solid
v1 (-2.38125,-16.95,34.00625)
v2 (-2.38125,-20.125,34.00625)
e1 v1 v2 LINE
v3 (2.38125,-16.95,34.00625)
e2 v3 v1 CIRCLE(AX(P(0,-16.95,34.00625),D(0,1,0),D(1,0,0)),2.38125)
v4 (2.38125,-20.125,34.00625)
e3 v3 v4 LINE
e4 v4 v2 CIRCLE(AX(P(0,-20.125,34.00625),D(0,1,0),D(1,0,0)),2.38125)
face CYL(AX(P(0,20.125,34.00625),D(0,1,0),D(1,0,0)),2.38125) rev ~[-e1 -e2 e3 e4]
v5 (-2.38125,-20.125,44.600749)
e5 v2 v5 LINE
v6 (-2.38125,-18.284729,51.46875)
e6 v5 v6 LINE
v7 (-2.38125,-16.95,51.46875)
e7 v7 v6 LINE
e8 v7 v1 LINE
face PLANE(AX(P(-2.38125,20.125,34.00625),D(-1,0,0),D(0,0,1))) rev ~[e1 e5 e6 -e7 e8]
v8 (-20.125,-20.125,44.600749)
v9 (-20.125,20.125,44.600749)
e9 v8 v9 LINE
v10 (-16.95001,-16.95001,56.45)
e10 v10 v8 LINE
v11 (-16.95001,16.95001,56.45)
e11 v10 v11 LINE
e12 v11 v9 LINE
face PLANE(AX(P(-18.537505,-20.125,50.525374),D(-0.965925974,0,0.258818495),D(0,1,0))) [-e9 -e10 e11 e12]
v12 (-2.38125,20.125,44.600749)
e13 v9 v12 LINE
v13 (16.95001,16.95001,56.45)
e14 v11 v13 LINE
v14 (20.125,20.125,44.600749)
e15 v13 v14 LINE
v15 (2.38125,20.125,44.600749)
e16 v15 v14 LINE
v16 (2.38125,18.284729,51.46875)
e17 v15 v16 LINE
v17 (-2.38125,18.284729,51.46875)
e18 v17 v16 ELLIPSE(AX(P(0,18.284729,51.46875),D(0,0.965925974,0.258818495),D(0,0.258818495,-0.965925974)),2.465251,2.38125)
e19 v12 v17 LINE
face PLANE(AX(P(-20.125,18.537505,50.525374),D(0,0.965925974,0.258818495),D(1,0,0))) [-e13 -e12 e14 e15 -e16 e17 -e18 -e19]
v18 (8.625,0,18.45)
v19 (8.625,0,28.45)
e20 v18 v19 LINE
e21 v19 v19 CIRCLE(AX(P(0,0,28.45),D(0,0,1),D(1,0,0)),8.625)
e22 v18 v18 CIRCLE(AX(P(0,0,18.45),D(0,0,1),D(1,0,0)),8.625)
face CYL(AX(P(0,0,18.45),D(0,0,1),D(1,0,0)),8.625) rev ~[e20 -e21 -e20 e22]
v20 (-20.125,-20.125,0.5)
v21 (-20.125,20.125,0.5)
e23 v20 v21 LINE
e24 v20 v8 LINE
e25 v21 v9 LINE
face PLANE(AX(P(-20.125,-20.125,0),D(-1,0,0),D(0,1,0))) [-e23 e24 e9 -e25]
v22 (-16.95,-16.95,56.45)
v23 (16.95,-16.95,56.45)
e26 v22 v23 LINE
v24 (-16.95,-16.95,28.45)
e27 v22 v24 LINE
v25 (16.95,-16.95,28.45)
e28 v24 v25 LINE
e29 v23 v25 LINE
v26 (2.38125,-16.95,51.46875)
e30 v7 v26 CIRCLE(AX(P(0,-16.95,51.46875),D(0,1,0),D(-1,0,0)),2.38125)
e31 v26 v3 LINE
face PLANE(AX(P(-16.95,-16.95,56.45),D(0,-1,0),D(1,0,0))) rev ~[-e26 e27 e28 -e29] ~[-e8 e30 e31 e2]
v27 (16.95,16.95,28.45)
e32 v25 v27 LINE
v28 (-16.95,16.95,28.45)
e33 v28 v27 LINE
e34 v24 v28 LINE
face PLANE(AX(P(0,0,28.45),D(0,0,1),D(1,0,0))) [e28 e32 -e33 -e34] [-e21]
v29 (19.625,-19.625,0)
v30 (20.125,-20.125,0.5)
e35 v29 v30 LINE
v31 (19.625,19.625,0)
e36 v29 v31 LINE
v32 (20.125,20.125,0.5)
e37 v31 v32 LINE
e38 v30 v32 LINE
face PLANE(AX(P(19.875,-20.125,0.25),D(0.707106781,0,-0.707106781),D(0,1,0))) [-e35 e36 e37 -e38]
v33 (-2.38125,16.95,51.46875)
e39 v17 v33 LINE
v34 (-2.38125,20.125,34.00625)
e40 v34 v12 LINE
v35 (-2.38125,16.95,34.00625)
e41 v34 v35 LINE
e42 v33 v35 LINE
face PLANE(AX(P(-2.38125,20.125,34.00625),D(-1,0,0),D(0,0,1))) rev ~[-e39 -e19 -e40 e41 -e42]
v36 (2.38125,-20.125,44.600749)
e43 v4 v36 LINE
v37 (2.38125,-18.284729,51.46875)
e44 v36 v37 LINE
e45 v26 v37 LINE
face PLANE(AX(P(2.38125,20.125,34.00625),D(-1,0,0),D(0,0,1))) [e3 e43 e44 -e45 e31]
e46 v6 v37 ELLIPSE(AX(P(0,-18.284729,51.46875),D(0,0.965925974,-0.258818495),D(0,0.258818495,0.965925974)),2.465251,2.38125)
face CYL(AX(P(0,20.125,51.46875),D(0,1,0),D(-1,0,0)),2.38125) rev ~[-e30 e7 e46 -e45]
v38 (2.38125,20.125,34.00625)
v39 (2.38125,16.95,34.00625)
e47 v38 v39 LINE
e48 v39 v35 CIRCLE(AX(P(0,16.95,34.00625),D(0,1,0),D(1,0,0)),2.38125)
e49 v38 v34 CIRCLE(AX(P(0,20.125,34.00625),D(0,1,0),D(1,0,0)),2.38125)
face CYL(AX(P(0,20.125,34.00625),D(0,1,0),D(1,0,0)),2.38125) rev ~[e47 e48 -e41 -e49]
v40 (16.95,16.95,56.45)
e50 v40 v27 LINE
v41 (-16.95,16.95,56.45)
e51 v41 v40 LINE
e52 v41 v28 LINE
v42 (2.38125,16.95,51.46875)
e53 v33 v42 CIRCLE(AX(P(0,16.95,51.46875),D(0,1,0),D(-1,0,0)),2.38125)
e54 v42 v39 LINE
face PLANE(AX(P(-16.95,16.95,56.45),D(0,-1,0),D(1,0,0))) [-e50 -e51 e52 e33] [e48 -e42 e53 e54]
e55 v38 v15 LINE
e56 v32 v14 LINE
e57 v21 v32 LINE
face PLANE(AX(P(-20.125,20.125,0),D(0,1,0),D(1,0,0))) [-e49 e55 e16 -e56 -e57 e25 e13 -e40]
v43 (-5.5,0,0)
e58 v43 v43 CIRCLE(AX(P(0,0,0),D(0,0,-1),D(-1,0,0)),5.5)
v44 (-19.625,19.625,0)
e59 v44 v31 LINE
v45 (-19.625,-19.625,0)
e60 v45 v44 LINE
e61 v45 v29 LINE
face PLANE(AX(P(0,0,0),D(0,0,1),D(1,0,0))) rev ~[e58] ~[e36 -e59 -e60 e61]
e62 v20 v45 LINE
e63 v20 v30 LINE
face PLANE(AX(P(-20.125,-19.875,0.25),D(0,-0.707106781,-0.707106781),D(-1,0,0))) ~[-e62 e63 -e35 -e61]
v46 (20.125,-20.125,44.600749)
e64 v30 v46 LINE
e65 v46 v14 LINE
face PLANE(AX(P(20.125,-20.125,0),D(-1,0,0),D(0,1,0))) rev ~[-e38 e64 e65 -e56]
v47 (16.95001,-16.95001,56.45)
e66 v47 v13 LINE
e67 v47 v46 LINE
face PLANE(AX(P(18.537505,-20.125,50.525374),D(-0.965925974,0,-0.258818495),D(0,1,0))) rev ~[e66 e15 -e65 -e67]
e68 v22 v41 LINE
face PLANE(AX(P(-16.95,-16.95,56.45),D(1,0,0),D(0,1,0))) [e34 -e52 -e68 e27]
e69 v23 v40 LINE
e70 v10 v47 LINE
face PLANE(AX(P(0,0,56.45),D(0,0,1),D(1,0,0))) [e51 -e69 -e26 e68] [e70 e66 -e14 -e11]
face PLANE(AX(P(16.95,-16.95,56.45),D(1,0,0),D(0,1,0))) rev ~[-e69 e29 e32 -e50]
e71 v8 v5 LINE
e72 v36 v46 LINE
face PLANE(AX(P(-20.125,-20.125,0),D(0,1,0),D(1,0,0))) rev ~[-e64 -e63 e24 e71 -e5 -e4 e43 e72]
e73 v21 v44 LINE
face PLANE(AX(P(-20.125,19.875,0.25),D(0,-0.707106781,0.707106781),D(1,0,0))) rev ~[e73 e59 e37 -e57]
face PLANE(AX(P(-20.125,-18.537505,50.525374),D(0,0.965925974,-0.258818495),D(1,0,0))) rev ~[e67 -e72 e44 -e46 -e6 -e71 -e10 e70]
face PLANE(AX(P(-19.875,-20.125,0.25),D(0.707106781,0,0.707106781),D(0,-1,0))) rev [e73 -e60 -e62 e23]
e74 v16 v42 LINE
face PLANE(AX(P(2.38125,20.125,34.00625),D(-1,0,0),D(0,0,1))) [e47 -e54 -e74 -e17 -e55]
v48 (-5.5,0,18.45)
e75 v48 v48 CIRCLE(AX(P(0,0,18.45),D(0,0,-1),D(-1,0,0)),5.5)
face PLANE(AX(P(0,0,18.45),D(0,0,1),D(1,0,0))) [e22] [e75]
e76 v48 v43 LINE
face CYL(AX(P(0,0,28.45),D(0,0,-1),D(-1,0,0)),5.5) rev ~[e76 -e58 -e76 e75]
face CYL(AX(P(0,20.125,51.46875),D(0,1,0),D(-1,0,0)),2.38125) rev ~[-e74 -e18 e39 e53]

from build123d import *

# Parameters (mm, degrees)
F0_W           = 40.25
F0_H           = 40.25
F1_DEPTH       = 56.45
F2_W           = 33.9
F2_H           = 33.9
F3_DEPTH       = 28
F5_D           = 11
F5_CBORE_D     = 17.25
F5_CBORE_DEPTH = 10
F6_SIZE2       = 11.849251
F6_SIZE        = 3.17499
F8_W           = 4.7625
F8_H           = 17.4625
F9_DEPTH       = 40.251
F10_SIZE       = 0.5


# Not quite as in the source:
# - a fillet or chamfer is up to 0.001 mm smaller than in the source, because OpenCascade refuses the exact size


with BuildPart() as f1:
    # F0 (on Top) → F1 (new body)
    with BuildSketch(Plane.XY):
        Rectangle(F0_W, F0_H)
    extrude(amount=F1_DEPTH)

    # F2 (on face) → F3 (cut)
    with BuildSketch(Plane.XY.offset(56.45)):
        Rectangle(F2_W, F2_H)
    extrude(amount=-F3_DEPTH, mode=Mode.SUBTRACT)

    # F5 (through all)
    with Locations(Plane.XY.offset(28.45)):
        with Locations((0, 0)):
            CounterBoreHole(F5_D / 2, F5_CBORE_D / 2, F5_CBORE_DEPTH)

    # F6 (size 3.175 and 11.849261314 in the source; OpenCascade refuses exactly that, so slightly less here)
    f6_edges = [f1.edges().sort_by_distance(p)[0] for p in [
        (0, 20.125, 56.45),
        (20.125, 0, 56.45),
        (0, -20.125, 56.45),
        (-20.125, 0, 56.45),
    ]]
    f6_side = f1.faces().sort_by_distance((0, -19.555779, 56.45))[0]
    chamfer(f6_edges, length=F6_SIZE, length2=F6_SIZE2, reference=f6_side)

    # F8 (on offset) → F9 (cut, through all)
    with BuildSketch(Plane(origin=(0, 20.125, 0), x_dir=(-1, 0, 0), z_dir=(0, 1, 0))):
        with BuildLine():
            ThreePointArc((-2.38125, 34.00625), (0, 31.625), (2.38125, 34.00625))
            Line((2.38125, 34.00625), (-2.38125, 34.00625))
        make_face()
        with Locations((0, 42.7375)):
            Rectangle(F8_W, F8_H)
        with BuildLine():
            Line((-2.38125, 51.46875), (2.38125, 51.46875))
            ThreePointArc((2.38125, 51.46875), (0, 53.85), (-2.38125, 51.46875))
        make_face()
    extrude(amount=-F9_DEPTH, mode=Mode.SUBTRACT)

    # F10
    f10_edges = [f1.edges().sort_by_distance(p)[0] for p in [
        (20.125, 0, 0),
        (0, -20.125, 0),
        (-20.125, 0, 0),
        (0, 20.125, 0),
    ]]
    chamfer(f10_edges, length=F10_SIZE)


solid = f1.part
